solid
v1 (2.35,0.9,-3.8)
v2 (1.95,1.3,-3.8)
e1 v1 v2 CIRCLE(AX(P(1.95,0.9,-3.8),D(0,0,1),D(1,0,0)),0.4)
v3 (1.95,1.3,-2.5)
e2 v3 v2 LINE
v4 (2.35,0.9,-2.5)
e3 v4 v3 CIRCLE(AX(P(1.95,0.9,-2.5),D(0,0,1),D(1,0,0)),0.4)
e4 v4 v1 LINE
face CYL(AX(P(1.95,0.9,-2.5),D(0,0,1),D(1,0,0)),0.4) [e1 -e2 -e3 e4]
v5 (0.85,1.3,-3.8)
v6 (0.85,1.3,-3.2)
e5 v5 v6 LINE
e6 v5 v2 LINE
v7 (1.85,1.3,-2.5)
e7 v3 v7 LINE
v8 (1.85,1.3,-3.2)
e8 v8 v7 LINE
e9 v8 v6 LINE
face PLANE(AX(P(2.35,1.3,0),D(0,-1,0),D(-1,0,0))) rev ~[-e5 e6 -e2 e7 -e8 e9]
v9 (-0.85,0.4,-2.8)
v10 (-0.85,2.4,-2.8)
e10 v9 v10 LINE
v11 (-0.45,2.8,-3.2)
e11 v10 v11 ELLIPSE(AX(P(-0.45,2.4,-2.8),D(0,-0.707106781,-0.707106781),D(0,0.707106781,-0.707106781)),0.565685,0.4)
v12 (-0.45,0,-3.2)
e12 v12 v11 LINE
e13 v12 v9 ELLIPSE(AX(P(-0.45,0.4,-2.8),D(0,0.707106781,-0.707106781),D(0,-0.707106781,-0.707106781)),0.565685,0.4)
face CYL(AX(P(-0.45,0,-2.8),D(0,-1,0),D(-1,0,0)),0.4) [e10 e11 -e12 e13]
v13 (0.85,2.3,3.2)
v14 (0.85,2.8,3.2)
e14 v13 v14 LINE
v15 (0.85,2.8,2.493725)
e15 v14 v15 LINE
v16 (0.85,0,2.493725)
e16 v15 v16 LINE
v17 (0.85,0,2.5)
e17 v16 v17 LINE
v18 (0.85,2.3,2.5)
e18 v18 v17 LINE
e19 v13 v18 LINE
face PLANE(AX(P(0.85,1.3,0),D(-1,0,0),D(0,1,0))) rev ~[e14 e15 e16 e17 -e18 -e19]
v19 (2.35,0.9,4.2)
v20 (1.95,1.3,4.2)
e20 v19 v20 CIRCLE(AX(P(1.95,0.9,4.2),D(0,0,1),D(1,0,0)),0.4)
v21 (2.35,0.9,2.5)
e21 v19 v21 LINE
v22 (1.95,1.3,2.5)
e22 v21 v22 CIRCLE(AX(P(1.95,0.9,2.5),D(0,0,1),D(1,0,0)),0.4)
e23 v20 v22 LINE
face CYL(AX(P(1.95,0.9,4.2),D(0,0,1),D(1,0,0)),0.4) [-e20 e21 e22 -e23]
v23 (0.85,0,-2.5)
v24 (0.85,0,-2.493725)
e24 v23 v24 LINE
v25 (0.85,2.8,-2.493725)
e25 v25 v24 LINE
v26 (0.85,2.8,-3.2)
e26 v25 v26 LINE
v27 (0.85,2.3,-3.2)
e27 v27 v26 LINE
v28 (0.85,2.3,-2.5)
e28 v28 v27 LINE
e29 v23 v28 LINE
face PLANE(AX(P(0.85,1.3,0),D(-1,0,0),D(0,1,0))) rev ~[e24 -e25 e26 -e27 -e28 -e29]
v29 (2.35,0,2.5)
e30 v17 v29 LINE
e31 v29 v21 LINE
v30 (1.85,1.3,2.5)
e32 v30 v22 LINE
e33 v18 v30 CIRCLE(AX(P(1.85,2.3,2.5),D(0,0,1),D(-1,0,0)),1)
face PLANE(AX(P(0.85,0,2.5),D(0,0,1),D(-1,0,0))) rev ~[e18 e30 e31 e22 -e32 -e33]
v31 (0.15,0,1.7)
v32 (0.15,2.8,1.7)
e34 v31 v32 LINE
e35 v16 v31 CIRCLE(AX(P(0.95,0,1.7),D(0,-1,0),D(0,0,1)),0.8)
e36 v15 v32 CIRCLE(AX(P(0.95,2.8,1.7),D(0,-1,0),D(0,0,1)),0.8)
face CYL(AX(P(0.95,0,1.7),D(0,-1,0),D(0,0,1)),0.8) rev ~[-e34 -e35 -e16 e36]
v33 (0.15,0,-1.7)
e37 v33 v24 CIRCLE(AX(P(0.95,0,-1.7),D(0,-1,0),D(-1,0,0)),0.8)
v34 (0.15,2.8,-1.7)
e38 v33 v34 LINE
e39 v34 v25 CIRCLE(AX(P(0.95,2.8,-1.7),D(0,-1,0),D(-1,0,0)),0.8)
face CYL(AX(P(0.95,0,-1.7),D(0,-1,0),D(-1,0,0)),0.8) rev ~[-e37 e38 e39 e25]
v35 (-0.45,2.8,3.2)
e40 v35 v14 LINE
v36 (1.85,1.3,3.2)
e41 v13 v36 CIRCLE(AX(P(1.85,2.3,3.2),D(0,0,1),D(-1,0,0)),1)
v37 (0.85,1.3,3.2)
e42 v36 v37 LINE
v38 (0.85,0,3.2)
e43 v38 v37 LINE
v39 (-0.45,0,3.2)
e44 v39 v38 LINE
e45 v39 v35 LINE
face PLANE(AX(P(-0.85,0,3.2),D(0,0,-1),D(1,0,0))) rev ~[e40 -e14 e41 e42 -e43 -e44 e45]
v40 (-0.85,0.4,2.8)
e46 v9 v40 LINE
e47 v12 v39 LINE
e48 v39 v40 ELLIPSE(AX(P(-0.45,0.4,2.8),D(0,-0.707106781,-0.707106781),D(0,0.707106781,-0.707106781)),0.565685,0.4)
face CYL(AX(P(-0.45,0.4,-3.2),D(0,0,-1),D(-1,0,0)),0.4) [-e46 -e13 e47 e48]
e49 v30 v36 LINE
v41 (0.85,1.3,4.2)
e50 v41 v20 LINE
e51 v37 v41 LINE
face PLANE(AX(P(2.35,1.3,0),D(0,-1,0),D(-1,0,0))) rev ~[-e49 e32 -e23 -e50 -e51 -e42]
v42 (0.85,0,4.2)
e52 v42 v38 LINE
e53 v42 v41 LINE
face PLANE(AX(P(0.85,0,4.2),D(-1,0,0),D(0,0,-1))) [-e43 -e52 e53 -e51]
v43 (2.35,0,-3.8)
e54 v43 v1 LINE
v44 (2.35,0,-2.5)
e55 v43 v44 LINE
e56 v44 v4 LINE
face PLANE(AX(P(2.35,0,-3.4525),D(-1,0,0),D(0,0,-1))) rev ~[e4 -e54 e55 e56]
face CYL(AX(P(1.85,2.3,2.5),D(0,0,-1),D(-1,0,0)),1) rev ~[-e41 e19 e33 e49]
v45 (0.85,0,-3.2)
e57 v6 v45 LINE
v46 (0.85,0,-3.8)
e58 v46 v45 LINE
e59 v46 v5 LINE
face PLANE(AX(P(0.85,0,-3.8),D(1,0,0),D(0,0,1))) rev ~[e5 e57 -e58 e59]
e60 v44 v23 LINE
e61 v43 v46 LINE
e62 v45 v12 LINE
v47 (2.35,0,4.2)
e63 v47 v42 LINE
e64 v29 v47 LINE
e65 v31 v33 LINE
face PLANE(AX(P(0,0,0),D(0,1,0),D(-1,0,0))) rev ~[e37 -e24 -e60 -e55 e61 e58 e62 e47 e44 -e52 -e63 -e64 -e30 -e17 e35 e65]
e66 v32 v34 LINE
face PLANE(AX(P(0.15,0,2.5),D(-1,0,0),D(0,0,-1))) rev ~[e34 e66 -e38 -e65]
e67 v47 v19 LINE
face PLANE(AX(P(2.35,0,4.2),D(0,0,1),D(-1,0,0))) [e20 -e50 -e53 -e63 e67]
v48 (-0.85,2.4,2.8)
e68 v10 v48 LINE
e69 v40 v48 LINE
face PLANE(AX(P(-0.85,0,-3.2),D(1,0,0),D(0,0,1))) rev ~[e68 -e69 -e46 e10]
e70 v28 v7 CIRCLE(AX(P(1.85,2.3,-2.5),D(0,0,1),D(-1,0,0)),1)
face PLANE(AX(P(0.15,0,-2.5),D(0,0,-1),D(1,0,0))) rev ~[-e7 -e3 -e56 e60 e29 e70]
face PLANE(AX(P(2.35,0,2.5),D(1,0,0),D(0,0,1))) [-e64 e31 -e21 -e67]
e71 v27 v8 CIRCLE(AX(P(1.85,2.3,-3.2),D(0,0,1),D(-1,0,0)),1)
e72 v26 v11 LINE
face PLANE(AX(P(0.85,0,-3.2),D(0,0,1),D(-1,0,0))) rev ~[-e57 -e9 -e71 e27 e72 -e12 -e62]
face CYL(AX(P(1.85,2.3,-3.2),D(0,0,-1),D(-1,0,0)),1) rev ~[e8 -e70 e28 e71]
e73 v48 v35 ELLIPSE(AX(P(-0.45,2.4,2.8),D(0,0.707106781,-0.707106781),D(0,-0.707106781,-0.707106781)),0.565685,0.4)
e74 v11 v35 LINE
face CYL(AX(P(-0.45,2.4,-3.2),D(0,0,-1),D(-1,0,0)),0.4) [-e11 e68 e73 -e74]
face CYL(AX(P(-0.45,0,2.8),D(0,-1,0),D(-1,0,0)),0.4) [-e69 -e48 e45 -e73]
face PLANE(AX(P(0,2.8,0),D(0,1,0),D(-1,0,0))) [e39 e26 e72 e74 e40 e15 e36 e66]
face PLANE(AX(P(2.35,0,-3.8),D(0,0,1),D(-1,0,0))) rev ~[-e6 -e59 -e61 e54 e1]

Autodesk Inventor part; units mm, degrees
ref_plane "YZ Plane" through (0, 0, 0) normal (1, 0, 0) x (0, 1, 0)
ref_plane "XZ Plane" through (0, 0, 0) normal (0, 1, 0) x (-1, 0, 0)
ref_plane "XY Plane" through (0, 0, 0) normal (0, 0, 1) x (1, 0, 0)
sketch "Sketch1" plane through (0, 0, 0) normal (0, 1, 0) x (-1, 0, 0)
  line L0 (0.85, 3.2) -> (-0.85, 3.2)
  line L1 (-0.85, 3.2) -> (-0.85, -3.2)
  line L2 (-0.85, -3.2) -> (0.85, -3.2)
  line L3 (0.85, -3.2) -> (0.85, 3.2)
  line L4 (0.85, 3.2) -> (-0.85, -3.2) construction
  line L5 (-0.85, 3.2) -> (0.85, -3.2) construction
  line L6 (-0.85, -1.3) -> (-2.35, -1.3) construction
  line L7 (-2.35, -1.3) -> (-2.35, -3.4525)
  line L8 (-0.85, -3.2) -> (-0.85, -1.3)
  line L9 (-2.35, -3.4525) -> (-2.35, -3.8)
  line L10 (-2.35, -3.8) -> (-0.85, -3.8)
  line L11 (-0.85, -3.8) -> (-0.85, -3.2)
  line L12 (-2.35, -2.5) -> (-0.85, -2.5)
  line L13 (0, 0) -> (-4.1965, 0) construction
  line L14 (-2.35, 1.3) -> (-2.35, 3.4525)
  line L15 (-2.35, 2.5) -> (-0.85, 2.5)
  line L16 (-0.85, 2.5) -> (-2.35, 2.5)
  line L17 (-2.35, 2.5) -> (-2.35, 4.2)
  line L18 (-2.35, 4.2) -> (-0.85, 4.2)
  line L19 (-0.85, 4.2) -> (-0.85, 2.5)
  line L20 (-0.85, 2.5) -> (-0.15, 2.5)
  line L21 (-0.15, 2.5) -> (-0.15, -2.5)
  line L22 (-0.15, -2.5) -> (-0.85, -2.5)
  line L23 (-0.85, -2.5) -> (-0.85, 2.5)
  point P0 (-0.85, 2.5)
  point P1 (-0.85, -2.5)
  point P2 (-2.35, 3.4525)
  dimension "d0" = 1.3
  dimension "d2" = 1.7
  dimension "d3" = 1.5
  dimension "d5" = 1.9
  dimension "d7" = 2.5
  dimension "d13" = 1
  dimension "d14" = 2.5
  dimension "d18" = 0.7
extrude "Extrusion1" add sketch "Sketch1" along normal blind 2.8 contours L3 L2 L1 L22 L21 L20 L0 | L1 L15 L14 L17 L18 L19 | L11 L10 L9 L7 L12 L1
sketch "Sketch2" plane through (0, 0, 0) normal (0, 0, 1) x (1, 0, 0)
  line L0 (0.85, 2.8) -> (2.35, 2.8)
  line L1 (2.35, 2.8) -> (2.35, 1.3)
  line L2 (2.35, 1.3) -> (0.85, 1.3)
  line L3 (0.85, 1.3) -> (0.85, 2.8)
  line L4 (2.35, 0) -> (2.35, 2.8) projected
  line L5 (0.85, 0) -> (0.85, 2.8) projected
  line L6 (0.85, 2.8) -> (2.35, 2.8) projected
  dimension "d15" = 1.5
extrude "Extrusion2" cut sketch "Sketch2" along normal through all both and the other way through all
fillet "Fillet1" radius 0.8 2 edges at (0.15, 1.4, -2.5) (0.15, 1.4, 2.5)
fillet "Fillet1" radius 1 2 edges at (0.85, 1.3, 2.85) (0.85, 1.3, -2.85)
fillet "Fillet1" radius 0.4 2 edges at (2.35, 1.3, 3.35) (2.35, 1.3, -3.15)
fillet "Fillet1" radius 0.4 4 edges at (-0.85, 2.8, 0) (-0.85, 0, 0) (-0.85, 1.4, -3.2) (-0.85, 1.4, 3.2)
equation "\"button_height\" = 1.3"
properties part number "Button"
